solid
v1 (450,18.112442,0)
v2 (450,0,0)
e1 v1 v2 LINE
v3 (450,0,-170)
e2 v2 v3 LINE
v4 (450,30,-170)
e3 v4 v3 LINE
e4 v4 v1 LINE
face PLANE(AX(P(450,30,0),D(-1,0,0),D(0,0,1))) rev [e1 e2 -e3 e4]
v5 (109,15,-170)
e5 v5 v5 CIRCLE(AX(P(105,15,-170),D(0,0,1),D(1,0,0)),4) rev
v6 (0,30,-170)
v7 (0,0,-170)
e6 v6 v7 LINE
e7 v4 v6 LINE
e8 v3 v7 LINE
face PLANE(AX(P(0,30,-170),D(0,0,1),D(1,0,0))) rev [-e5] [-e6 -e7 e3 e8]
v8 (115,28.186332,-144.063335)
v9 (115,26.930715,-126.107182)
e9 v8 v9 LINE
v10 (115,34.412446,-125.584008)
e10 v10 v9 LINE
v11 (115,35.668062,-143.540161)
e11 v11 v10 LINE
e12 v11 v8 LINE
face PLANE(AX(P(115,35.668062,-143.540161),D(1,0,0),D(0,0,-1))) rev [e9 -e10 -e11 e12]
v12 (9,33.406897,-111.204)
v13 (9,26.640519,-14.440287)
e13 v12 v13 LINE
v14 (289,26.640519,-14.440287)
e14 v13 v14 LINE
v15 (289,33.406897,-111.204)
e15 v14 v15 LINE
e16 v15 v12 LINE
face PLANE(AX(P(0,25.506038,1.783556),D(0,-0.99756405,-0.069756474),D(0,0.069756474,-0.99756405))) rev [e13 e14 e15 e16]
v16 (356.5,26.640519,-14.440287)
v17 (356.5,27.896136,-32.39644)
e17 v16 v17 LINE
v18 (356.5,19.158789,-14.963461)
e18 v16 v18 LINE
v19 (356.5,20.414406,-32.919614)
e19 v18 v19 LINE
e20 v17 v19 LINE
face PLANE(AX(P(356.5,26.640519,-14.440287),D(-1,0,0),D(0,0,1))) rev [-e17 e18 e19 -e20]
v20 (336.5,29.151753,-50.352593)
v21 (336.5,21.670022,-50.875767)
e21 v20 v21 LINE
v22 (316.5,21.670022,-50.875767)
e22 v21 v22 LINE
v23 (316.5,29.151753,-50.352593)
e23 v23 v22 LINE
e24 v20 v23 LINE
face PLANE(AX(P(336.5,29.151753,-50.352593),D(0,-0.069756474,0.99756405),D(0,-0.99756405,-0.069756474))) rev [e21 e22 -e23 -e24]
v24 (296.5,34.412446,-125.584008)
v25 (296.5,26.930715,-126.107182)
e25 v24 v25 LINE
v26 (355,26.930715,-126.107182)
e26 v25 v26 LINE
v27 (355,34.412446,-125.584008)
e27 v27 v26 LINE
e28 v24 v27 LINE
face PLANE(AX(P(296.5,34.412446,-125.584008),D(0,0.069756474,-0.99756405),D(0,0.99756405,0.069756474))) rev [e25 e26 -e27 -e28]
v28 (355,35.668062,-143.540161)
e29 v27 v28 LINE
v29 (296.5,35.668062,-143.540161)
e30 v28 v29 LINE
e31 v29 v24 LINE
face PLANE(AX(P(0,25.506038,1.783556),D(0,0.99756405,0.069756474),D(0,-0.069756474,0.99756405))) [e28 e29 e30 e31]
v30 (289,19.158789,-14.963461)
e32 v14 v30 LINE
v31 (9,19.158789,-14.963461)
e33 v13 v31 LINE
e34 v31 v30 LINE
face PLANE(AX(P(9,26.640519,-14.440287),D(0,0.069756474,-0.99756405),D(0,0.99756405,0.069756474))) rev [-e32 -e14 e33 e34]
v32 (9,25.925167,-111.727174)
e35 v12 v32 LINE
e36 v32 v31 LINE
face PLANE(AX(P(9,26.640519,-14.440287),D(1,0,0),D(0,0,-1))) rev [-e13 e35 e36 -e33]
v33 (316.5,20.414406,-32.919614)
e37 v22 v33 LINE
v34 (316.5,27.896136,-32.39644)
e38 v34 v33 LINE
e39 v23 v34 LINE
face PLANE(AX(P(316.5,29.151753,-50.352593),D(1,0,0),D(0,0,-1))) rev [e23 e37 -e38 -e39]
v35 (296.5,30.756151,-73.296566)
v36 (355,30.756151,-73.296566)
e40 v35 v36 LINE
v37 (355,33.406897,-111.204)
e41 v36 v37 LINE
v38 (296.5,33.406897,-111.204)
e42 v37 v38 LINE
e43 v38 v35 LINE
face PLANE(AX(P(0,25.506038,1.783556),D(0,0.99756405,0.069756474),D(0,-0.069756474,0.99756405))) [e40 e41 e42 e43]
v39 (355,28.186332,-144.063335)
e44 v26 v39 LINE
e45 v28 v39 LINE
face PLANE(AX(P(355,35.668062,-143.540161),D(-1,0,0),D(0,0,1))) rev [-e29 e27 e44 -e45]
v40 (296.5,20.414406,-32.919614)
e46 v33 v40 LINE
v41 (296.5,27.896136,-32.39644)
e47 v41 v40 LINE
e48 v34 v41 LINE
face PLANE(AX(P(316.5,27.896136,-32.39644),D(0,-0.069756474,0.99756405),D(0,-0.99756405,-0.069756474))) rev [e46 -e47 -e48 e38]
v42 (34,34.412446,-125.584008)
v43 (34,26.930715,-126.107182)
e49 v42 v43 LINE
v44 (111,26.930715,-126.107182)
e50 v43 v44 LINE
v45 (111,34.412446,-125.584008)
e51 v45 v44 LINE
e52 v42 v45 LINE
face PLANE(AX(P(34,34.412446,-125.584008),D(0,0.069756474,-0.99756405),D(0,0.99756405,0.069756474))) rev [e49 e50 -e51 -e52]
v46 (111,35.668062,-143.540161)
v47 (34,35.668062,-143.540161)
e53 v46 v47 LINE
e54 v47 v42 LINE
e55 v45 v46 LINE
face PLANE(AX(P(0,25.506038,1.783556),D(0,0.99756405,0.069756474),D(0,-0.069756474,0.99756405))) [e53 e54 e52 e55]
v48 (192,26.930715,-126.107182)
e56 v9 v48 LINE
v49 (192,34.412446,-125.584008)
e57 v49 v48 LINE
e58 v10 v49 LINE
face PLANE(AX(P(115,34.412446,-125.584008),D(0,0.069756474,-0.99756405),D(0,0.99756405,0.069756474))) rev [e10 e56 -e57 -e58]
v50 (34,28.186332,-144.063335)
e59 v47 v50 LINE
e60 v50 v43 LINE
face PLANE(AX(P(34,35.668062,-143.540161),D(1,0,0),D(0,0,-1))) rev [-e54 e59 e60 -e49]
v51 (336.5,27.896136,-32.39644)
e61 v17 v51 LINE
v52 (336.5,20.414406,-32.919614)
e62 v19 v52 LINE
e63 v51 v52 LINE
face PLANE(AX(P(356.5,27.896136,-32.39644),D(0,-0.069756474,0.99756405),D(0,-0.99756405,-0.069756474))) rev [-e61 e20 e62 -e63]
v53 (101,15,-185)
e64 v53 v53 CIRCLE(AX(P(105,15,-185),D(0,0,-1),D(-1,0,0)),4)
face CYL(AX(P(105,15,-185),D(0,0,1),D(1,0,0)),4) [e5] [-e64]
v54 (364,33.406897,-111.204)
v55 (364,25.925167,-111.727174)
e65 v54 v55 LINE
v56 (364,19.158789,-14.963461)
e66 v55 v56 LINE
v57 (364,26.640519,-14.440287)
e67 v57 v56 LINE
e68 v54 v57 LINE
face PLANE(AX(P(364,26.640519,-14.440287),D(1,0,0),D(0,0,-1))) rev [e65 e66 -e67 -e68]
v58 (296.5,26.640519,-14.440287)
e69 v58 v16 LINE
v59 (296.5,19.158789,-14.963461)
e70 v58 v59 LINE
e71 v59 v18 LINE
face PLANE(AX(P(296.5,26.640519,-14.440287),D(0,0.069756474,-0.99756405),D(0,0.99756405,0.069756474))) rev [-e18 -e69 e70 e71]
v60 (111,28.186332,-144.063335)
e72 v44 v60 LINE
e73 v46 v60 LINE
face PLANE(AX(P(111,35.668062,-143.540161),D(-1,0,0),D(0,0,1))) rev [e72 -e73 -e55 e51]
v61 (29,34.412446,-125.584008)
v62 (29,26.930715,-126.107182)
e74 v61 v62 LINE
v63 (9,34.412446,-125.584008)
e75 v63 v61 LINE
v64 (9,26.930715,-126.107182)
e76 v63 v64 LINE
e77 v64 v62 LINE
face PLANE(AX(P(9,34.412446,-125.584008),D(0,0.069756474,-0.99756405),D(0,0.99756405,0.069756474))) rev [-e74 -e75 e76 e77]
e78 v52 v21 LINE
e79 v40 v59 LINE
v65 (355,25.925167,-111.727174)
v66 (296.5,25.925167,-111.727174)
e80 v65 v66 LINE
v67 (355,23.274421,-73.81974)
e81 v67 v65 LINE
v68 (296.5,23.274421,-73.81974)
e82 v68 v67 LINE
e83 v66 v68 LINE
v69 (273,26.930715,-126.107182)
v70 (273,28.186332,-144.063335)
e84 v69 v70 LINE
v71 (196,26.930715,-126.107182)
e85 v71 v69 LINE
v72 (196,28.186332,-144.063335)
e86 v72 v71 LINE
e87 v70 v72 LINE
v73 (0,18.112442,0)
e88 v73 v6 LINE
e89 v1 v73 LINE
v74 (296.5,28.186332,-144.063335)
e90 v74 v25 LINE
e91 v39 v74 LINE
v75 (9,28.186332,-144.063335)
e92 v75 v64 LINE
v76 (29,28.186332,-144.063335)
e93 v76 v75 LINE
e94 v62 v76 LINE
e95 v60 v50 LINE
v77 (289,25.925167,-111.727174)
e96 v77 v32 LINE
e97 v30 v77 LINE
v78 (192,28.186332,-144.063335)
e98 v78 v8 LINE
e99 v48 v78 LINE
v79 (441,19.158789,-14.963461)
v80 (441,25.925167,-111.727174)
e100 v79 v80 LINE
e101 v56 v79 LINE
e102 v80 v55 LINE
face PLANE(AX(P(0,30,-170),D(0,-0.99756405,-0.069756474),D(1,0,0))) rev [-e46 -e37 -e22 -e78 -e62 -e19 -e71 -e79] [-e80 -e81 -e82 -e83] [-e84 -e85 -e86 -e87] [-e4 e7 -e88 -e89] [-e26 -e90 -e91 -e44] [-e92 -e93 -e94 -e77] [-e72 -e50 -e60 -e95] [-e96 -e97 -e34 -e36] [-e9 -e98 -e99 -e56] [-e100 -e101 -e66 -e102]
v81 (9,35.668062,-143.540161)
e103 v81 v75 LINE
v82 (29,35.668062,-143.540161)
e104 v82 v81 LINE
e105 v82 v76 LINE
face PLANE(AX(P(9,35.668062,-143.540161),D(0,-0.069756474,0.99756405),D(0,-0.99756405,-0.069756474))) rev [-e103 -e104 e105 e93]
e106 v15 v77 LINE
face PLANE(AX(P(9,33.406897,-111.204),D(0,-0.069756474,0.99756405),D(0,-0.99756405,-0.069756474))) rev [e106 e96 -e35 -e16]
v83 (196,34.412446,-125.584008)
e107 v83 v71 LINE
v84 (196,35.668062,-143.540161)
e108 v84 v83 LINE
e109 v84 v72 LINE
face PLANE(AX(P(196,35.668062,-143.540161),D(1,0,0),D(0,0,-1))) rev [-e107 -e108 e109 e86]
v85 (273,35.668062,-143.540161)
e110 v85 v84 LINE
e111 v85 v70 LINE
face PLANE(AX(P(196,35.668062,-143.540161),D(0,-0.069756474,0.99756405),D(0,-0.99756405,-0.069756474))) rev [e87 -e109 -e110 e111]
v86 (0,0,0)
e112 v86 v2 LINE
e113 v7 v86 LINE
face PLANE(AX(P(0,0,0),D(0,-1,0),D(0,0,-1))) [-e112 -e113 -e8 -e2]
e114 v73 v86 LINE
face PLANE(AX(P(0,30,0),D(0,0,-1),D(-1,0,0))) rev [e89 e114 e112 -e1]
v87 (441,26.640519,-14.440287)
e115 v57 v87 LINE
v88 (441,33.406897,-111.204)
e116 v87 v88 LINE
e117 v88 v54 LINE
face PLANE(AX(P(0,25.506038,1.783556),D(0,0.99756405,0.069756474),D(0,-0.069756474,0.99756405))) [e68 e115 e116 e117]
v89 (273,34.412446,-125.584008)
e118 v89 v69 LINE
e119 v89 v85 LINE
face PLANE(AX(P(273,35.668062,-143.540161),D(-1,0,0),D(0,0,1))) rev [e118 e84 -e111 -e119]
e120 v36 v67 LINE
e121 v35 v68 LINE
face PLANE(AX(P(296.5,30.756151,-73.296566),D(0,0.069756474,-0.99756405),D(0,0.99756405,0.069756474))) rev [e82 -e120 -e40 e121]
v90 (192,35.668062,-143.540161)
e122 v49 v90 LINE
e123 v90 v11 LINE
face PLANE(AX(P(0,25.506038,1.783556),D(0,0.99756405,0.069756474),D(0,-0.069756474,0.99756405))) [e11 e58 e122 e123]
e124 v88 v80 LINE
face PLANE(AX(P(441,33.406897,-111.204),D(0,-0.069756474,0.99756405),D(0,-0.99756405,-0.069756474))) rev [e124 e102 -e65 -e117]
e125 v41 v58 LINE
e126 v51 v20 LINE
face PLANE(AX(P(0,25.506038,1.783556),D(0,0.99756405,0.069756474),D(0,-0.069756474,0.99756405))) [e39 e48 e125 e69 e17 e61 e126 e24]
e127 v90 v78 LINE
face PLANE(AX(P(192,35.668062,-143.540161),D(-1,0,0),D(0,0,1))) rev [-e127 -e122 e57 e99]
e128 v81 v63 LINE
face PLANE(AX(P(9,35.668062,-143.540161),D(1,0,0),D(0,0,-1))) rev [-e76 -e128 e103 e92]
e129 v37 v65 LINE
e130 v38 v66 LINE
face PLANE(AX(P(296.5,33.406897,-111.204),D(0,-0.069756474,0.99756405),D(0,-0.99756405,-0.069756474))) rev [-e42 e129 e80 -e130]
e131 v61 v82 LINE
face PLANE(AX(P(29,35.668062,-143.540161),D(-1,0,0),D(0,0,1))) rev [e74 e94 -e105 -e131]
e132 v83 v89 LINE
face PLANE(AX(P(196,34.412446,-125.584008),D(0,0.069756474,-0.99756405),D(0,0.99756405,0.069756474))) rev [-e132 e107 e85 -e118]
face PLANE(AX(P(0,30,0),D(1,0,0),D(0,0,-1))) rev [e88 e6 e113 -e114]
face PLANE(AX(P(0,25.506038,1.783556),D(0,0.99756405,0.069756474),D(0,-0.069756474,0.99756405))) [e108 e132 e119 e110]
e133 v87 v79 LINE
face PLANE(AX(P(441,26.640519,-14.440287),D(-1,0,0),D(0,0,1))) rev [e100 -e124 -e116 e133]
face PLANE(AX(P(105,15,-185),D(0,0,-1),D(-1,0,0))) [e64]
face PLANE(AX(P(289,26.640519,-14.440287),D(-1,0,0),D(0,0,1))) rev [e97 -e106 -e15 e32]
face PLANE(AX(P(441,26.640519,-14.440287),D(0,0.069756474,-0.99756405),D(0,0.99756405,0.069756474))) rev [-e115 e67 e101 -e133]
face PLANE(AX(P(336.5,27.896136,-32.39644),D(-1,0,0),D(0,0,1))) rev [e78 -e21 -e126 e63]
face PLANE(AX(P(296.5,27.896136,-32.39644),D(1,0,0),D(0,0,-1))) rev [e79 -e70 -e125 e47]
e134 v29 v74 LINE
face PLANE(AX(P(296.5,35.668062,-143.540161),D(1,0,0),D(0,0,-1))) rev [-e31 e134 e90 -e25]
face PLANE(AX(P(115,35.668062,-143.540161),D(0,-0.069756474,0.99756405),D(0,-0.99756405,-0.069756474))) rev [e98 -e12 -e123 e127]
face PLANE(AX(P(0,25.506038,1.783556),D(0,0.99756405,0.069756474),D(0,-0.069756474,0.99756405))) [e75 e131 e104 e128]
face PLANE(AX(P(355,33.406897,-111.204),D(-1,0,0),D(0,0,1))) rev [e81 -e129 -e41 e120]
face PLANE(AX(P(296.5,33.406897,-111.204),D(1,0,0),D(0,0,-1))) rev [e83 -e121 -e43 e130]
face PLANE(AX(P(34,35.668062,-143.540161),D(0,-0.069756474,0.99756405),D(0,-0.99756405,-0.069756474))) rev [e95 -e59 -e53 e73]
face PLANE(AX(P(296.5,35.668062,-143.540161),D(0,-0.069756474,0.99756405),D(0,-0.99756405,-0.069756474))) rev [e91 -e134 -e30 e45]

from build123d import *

# Parameters (mm, degrees)
SKETCH1_W           = 450
SKETCH1_H           = 170
BOSS_EXTRUDE1_DEPTH = 30
CHAMFER1_SIZE       = 11.88755803
CHAMFER1_SIZE_2     = 170
SKETCH2_R           = 4
BOSS_EXTRUDE2_DEPTH = 15
SKETCH3_W           = 280
SKETCH3_H           = 97
SKETCH3_W_2         = 20
SKETCH3_H_2         = 18
SKETCH3_W_3         = 77
SKETCH3_W_4         = 58.5
SKETCH3_H_3         = 38
BOSS_EXTRUDE3_DEPTH = 7.5


with BuildPart() as part:
    # Sketch1 → Boss-Extrude1 (new body)
    with BuildSketch(Plane(origin=(0, 0, 0), x_dir=(1, 0, 0), z_dir=(0, 1, 0))):
        with Locations((225, 85)):
            Rectangle(SKETCH1_W, SKETCH1_H)
    extrude(amount=BOSS_EXTRUDE1_DEPTH)

    # Chamfer1
    # the kernel refuses this chamfer: 170, 11.88755803 mm, written as the material it takes off along each edge
    with BuildSketch(Plane(origin=(-441.960179797, 30, 0), x_dir=(0, -0.8766829747338916, 0.48106856248536445), z_dir=(1, 0, 0))) as chamfer1_piece_1:
        Polygon((CHAMFER1_SIZE * 0.876682974763, CHAMFER1_SIZE * 0.481068562501), (-CHAMFER1_SIZE_2 * 0.481068562485, CHAMFER1_SIZE_2 * 0.876682974734), (0, 0), align=None)
    extrude(amount=1333.920359594, mode=Mode.SUBTRACT)

    # Sketch2 → Boss-Extrude2 (add)
    with BuildSketch(Plane(origin=(0, 0, -170), x_dir=(-1, 0, 0), z_dir=(0, 0, -1))):
        with Locations(Location((-105, 15, 0), (0, 0, 180))):
            Circle(SKETCH2_R)
    extrude(amount=BOSS_EXTRUDE2_DEPTH)

    # Sketch3 → Boss-Extrude3 (add)
    with BuildSketch(Plane(origin=(0, 18.02430745, 1.260382357), x_dir=(1, 0, 0), z_dir=(0, 0.9975640502598245, 0.06975647374412289))):
        Polygon((296.5, 16.263460083), (356.5, 16.263460083), (356.5, 34.263460083), (336.5, 34.263460083), (336.5, 52.263460083), (316.5, 52.263460083), (316.5, 34.263460083), (296.5, 34.263460083), align=None)
        with Locations((149, 64.763460083)):
            Rectangle(SKETCH3_W, SKETCH3_H)
        with Locations((19, 136.678582756)):
            Rectangle(SKETCH3_W_2, SKETCH3_H_2)
        with Locations((72.5, 136.678582756)):
            Rectangle(SKETCH3_W_3, SKETCH3_H_2)
        with Locations((153.5, 136.678582756)):
            Rectangle(SKETCH3_W_3, SKETCH3_H_2)
        with Locations((234.5, 136.678582756)):
            Rectangle(SKETCH3_W_3, SKETCH3_H_2)
        with Locations((325.75, 136.678582756)):
            Rectangle(SKETCH3_W_4, SKETCH3_H_2)
        with Locations((325.75, 94.263460083)):
            Rectangle(SKETCH3_W_4, SKETCH3_H_3)
        with Locations((402.5, 64.763460083)):
            Rectangle(SKETCH3_W_3, SKETCH3_H)
    extrude(amount=BOSS_EXTRUDE3_DEPTH)


solid = part.part
